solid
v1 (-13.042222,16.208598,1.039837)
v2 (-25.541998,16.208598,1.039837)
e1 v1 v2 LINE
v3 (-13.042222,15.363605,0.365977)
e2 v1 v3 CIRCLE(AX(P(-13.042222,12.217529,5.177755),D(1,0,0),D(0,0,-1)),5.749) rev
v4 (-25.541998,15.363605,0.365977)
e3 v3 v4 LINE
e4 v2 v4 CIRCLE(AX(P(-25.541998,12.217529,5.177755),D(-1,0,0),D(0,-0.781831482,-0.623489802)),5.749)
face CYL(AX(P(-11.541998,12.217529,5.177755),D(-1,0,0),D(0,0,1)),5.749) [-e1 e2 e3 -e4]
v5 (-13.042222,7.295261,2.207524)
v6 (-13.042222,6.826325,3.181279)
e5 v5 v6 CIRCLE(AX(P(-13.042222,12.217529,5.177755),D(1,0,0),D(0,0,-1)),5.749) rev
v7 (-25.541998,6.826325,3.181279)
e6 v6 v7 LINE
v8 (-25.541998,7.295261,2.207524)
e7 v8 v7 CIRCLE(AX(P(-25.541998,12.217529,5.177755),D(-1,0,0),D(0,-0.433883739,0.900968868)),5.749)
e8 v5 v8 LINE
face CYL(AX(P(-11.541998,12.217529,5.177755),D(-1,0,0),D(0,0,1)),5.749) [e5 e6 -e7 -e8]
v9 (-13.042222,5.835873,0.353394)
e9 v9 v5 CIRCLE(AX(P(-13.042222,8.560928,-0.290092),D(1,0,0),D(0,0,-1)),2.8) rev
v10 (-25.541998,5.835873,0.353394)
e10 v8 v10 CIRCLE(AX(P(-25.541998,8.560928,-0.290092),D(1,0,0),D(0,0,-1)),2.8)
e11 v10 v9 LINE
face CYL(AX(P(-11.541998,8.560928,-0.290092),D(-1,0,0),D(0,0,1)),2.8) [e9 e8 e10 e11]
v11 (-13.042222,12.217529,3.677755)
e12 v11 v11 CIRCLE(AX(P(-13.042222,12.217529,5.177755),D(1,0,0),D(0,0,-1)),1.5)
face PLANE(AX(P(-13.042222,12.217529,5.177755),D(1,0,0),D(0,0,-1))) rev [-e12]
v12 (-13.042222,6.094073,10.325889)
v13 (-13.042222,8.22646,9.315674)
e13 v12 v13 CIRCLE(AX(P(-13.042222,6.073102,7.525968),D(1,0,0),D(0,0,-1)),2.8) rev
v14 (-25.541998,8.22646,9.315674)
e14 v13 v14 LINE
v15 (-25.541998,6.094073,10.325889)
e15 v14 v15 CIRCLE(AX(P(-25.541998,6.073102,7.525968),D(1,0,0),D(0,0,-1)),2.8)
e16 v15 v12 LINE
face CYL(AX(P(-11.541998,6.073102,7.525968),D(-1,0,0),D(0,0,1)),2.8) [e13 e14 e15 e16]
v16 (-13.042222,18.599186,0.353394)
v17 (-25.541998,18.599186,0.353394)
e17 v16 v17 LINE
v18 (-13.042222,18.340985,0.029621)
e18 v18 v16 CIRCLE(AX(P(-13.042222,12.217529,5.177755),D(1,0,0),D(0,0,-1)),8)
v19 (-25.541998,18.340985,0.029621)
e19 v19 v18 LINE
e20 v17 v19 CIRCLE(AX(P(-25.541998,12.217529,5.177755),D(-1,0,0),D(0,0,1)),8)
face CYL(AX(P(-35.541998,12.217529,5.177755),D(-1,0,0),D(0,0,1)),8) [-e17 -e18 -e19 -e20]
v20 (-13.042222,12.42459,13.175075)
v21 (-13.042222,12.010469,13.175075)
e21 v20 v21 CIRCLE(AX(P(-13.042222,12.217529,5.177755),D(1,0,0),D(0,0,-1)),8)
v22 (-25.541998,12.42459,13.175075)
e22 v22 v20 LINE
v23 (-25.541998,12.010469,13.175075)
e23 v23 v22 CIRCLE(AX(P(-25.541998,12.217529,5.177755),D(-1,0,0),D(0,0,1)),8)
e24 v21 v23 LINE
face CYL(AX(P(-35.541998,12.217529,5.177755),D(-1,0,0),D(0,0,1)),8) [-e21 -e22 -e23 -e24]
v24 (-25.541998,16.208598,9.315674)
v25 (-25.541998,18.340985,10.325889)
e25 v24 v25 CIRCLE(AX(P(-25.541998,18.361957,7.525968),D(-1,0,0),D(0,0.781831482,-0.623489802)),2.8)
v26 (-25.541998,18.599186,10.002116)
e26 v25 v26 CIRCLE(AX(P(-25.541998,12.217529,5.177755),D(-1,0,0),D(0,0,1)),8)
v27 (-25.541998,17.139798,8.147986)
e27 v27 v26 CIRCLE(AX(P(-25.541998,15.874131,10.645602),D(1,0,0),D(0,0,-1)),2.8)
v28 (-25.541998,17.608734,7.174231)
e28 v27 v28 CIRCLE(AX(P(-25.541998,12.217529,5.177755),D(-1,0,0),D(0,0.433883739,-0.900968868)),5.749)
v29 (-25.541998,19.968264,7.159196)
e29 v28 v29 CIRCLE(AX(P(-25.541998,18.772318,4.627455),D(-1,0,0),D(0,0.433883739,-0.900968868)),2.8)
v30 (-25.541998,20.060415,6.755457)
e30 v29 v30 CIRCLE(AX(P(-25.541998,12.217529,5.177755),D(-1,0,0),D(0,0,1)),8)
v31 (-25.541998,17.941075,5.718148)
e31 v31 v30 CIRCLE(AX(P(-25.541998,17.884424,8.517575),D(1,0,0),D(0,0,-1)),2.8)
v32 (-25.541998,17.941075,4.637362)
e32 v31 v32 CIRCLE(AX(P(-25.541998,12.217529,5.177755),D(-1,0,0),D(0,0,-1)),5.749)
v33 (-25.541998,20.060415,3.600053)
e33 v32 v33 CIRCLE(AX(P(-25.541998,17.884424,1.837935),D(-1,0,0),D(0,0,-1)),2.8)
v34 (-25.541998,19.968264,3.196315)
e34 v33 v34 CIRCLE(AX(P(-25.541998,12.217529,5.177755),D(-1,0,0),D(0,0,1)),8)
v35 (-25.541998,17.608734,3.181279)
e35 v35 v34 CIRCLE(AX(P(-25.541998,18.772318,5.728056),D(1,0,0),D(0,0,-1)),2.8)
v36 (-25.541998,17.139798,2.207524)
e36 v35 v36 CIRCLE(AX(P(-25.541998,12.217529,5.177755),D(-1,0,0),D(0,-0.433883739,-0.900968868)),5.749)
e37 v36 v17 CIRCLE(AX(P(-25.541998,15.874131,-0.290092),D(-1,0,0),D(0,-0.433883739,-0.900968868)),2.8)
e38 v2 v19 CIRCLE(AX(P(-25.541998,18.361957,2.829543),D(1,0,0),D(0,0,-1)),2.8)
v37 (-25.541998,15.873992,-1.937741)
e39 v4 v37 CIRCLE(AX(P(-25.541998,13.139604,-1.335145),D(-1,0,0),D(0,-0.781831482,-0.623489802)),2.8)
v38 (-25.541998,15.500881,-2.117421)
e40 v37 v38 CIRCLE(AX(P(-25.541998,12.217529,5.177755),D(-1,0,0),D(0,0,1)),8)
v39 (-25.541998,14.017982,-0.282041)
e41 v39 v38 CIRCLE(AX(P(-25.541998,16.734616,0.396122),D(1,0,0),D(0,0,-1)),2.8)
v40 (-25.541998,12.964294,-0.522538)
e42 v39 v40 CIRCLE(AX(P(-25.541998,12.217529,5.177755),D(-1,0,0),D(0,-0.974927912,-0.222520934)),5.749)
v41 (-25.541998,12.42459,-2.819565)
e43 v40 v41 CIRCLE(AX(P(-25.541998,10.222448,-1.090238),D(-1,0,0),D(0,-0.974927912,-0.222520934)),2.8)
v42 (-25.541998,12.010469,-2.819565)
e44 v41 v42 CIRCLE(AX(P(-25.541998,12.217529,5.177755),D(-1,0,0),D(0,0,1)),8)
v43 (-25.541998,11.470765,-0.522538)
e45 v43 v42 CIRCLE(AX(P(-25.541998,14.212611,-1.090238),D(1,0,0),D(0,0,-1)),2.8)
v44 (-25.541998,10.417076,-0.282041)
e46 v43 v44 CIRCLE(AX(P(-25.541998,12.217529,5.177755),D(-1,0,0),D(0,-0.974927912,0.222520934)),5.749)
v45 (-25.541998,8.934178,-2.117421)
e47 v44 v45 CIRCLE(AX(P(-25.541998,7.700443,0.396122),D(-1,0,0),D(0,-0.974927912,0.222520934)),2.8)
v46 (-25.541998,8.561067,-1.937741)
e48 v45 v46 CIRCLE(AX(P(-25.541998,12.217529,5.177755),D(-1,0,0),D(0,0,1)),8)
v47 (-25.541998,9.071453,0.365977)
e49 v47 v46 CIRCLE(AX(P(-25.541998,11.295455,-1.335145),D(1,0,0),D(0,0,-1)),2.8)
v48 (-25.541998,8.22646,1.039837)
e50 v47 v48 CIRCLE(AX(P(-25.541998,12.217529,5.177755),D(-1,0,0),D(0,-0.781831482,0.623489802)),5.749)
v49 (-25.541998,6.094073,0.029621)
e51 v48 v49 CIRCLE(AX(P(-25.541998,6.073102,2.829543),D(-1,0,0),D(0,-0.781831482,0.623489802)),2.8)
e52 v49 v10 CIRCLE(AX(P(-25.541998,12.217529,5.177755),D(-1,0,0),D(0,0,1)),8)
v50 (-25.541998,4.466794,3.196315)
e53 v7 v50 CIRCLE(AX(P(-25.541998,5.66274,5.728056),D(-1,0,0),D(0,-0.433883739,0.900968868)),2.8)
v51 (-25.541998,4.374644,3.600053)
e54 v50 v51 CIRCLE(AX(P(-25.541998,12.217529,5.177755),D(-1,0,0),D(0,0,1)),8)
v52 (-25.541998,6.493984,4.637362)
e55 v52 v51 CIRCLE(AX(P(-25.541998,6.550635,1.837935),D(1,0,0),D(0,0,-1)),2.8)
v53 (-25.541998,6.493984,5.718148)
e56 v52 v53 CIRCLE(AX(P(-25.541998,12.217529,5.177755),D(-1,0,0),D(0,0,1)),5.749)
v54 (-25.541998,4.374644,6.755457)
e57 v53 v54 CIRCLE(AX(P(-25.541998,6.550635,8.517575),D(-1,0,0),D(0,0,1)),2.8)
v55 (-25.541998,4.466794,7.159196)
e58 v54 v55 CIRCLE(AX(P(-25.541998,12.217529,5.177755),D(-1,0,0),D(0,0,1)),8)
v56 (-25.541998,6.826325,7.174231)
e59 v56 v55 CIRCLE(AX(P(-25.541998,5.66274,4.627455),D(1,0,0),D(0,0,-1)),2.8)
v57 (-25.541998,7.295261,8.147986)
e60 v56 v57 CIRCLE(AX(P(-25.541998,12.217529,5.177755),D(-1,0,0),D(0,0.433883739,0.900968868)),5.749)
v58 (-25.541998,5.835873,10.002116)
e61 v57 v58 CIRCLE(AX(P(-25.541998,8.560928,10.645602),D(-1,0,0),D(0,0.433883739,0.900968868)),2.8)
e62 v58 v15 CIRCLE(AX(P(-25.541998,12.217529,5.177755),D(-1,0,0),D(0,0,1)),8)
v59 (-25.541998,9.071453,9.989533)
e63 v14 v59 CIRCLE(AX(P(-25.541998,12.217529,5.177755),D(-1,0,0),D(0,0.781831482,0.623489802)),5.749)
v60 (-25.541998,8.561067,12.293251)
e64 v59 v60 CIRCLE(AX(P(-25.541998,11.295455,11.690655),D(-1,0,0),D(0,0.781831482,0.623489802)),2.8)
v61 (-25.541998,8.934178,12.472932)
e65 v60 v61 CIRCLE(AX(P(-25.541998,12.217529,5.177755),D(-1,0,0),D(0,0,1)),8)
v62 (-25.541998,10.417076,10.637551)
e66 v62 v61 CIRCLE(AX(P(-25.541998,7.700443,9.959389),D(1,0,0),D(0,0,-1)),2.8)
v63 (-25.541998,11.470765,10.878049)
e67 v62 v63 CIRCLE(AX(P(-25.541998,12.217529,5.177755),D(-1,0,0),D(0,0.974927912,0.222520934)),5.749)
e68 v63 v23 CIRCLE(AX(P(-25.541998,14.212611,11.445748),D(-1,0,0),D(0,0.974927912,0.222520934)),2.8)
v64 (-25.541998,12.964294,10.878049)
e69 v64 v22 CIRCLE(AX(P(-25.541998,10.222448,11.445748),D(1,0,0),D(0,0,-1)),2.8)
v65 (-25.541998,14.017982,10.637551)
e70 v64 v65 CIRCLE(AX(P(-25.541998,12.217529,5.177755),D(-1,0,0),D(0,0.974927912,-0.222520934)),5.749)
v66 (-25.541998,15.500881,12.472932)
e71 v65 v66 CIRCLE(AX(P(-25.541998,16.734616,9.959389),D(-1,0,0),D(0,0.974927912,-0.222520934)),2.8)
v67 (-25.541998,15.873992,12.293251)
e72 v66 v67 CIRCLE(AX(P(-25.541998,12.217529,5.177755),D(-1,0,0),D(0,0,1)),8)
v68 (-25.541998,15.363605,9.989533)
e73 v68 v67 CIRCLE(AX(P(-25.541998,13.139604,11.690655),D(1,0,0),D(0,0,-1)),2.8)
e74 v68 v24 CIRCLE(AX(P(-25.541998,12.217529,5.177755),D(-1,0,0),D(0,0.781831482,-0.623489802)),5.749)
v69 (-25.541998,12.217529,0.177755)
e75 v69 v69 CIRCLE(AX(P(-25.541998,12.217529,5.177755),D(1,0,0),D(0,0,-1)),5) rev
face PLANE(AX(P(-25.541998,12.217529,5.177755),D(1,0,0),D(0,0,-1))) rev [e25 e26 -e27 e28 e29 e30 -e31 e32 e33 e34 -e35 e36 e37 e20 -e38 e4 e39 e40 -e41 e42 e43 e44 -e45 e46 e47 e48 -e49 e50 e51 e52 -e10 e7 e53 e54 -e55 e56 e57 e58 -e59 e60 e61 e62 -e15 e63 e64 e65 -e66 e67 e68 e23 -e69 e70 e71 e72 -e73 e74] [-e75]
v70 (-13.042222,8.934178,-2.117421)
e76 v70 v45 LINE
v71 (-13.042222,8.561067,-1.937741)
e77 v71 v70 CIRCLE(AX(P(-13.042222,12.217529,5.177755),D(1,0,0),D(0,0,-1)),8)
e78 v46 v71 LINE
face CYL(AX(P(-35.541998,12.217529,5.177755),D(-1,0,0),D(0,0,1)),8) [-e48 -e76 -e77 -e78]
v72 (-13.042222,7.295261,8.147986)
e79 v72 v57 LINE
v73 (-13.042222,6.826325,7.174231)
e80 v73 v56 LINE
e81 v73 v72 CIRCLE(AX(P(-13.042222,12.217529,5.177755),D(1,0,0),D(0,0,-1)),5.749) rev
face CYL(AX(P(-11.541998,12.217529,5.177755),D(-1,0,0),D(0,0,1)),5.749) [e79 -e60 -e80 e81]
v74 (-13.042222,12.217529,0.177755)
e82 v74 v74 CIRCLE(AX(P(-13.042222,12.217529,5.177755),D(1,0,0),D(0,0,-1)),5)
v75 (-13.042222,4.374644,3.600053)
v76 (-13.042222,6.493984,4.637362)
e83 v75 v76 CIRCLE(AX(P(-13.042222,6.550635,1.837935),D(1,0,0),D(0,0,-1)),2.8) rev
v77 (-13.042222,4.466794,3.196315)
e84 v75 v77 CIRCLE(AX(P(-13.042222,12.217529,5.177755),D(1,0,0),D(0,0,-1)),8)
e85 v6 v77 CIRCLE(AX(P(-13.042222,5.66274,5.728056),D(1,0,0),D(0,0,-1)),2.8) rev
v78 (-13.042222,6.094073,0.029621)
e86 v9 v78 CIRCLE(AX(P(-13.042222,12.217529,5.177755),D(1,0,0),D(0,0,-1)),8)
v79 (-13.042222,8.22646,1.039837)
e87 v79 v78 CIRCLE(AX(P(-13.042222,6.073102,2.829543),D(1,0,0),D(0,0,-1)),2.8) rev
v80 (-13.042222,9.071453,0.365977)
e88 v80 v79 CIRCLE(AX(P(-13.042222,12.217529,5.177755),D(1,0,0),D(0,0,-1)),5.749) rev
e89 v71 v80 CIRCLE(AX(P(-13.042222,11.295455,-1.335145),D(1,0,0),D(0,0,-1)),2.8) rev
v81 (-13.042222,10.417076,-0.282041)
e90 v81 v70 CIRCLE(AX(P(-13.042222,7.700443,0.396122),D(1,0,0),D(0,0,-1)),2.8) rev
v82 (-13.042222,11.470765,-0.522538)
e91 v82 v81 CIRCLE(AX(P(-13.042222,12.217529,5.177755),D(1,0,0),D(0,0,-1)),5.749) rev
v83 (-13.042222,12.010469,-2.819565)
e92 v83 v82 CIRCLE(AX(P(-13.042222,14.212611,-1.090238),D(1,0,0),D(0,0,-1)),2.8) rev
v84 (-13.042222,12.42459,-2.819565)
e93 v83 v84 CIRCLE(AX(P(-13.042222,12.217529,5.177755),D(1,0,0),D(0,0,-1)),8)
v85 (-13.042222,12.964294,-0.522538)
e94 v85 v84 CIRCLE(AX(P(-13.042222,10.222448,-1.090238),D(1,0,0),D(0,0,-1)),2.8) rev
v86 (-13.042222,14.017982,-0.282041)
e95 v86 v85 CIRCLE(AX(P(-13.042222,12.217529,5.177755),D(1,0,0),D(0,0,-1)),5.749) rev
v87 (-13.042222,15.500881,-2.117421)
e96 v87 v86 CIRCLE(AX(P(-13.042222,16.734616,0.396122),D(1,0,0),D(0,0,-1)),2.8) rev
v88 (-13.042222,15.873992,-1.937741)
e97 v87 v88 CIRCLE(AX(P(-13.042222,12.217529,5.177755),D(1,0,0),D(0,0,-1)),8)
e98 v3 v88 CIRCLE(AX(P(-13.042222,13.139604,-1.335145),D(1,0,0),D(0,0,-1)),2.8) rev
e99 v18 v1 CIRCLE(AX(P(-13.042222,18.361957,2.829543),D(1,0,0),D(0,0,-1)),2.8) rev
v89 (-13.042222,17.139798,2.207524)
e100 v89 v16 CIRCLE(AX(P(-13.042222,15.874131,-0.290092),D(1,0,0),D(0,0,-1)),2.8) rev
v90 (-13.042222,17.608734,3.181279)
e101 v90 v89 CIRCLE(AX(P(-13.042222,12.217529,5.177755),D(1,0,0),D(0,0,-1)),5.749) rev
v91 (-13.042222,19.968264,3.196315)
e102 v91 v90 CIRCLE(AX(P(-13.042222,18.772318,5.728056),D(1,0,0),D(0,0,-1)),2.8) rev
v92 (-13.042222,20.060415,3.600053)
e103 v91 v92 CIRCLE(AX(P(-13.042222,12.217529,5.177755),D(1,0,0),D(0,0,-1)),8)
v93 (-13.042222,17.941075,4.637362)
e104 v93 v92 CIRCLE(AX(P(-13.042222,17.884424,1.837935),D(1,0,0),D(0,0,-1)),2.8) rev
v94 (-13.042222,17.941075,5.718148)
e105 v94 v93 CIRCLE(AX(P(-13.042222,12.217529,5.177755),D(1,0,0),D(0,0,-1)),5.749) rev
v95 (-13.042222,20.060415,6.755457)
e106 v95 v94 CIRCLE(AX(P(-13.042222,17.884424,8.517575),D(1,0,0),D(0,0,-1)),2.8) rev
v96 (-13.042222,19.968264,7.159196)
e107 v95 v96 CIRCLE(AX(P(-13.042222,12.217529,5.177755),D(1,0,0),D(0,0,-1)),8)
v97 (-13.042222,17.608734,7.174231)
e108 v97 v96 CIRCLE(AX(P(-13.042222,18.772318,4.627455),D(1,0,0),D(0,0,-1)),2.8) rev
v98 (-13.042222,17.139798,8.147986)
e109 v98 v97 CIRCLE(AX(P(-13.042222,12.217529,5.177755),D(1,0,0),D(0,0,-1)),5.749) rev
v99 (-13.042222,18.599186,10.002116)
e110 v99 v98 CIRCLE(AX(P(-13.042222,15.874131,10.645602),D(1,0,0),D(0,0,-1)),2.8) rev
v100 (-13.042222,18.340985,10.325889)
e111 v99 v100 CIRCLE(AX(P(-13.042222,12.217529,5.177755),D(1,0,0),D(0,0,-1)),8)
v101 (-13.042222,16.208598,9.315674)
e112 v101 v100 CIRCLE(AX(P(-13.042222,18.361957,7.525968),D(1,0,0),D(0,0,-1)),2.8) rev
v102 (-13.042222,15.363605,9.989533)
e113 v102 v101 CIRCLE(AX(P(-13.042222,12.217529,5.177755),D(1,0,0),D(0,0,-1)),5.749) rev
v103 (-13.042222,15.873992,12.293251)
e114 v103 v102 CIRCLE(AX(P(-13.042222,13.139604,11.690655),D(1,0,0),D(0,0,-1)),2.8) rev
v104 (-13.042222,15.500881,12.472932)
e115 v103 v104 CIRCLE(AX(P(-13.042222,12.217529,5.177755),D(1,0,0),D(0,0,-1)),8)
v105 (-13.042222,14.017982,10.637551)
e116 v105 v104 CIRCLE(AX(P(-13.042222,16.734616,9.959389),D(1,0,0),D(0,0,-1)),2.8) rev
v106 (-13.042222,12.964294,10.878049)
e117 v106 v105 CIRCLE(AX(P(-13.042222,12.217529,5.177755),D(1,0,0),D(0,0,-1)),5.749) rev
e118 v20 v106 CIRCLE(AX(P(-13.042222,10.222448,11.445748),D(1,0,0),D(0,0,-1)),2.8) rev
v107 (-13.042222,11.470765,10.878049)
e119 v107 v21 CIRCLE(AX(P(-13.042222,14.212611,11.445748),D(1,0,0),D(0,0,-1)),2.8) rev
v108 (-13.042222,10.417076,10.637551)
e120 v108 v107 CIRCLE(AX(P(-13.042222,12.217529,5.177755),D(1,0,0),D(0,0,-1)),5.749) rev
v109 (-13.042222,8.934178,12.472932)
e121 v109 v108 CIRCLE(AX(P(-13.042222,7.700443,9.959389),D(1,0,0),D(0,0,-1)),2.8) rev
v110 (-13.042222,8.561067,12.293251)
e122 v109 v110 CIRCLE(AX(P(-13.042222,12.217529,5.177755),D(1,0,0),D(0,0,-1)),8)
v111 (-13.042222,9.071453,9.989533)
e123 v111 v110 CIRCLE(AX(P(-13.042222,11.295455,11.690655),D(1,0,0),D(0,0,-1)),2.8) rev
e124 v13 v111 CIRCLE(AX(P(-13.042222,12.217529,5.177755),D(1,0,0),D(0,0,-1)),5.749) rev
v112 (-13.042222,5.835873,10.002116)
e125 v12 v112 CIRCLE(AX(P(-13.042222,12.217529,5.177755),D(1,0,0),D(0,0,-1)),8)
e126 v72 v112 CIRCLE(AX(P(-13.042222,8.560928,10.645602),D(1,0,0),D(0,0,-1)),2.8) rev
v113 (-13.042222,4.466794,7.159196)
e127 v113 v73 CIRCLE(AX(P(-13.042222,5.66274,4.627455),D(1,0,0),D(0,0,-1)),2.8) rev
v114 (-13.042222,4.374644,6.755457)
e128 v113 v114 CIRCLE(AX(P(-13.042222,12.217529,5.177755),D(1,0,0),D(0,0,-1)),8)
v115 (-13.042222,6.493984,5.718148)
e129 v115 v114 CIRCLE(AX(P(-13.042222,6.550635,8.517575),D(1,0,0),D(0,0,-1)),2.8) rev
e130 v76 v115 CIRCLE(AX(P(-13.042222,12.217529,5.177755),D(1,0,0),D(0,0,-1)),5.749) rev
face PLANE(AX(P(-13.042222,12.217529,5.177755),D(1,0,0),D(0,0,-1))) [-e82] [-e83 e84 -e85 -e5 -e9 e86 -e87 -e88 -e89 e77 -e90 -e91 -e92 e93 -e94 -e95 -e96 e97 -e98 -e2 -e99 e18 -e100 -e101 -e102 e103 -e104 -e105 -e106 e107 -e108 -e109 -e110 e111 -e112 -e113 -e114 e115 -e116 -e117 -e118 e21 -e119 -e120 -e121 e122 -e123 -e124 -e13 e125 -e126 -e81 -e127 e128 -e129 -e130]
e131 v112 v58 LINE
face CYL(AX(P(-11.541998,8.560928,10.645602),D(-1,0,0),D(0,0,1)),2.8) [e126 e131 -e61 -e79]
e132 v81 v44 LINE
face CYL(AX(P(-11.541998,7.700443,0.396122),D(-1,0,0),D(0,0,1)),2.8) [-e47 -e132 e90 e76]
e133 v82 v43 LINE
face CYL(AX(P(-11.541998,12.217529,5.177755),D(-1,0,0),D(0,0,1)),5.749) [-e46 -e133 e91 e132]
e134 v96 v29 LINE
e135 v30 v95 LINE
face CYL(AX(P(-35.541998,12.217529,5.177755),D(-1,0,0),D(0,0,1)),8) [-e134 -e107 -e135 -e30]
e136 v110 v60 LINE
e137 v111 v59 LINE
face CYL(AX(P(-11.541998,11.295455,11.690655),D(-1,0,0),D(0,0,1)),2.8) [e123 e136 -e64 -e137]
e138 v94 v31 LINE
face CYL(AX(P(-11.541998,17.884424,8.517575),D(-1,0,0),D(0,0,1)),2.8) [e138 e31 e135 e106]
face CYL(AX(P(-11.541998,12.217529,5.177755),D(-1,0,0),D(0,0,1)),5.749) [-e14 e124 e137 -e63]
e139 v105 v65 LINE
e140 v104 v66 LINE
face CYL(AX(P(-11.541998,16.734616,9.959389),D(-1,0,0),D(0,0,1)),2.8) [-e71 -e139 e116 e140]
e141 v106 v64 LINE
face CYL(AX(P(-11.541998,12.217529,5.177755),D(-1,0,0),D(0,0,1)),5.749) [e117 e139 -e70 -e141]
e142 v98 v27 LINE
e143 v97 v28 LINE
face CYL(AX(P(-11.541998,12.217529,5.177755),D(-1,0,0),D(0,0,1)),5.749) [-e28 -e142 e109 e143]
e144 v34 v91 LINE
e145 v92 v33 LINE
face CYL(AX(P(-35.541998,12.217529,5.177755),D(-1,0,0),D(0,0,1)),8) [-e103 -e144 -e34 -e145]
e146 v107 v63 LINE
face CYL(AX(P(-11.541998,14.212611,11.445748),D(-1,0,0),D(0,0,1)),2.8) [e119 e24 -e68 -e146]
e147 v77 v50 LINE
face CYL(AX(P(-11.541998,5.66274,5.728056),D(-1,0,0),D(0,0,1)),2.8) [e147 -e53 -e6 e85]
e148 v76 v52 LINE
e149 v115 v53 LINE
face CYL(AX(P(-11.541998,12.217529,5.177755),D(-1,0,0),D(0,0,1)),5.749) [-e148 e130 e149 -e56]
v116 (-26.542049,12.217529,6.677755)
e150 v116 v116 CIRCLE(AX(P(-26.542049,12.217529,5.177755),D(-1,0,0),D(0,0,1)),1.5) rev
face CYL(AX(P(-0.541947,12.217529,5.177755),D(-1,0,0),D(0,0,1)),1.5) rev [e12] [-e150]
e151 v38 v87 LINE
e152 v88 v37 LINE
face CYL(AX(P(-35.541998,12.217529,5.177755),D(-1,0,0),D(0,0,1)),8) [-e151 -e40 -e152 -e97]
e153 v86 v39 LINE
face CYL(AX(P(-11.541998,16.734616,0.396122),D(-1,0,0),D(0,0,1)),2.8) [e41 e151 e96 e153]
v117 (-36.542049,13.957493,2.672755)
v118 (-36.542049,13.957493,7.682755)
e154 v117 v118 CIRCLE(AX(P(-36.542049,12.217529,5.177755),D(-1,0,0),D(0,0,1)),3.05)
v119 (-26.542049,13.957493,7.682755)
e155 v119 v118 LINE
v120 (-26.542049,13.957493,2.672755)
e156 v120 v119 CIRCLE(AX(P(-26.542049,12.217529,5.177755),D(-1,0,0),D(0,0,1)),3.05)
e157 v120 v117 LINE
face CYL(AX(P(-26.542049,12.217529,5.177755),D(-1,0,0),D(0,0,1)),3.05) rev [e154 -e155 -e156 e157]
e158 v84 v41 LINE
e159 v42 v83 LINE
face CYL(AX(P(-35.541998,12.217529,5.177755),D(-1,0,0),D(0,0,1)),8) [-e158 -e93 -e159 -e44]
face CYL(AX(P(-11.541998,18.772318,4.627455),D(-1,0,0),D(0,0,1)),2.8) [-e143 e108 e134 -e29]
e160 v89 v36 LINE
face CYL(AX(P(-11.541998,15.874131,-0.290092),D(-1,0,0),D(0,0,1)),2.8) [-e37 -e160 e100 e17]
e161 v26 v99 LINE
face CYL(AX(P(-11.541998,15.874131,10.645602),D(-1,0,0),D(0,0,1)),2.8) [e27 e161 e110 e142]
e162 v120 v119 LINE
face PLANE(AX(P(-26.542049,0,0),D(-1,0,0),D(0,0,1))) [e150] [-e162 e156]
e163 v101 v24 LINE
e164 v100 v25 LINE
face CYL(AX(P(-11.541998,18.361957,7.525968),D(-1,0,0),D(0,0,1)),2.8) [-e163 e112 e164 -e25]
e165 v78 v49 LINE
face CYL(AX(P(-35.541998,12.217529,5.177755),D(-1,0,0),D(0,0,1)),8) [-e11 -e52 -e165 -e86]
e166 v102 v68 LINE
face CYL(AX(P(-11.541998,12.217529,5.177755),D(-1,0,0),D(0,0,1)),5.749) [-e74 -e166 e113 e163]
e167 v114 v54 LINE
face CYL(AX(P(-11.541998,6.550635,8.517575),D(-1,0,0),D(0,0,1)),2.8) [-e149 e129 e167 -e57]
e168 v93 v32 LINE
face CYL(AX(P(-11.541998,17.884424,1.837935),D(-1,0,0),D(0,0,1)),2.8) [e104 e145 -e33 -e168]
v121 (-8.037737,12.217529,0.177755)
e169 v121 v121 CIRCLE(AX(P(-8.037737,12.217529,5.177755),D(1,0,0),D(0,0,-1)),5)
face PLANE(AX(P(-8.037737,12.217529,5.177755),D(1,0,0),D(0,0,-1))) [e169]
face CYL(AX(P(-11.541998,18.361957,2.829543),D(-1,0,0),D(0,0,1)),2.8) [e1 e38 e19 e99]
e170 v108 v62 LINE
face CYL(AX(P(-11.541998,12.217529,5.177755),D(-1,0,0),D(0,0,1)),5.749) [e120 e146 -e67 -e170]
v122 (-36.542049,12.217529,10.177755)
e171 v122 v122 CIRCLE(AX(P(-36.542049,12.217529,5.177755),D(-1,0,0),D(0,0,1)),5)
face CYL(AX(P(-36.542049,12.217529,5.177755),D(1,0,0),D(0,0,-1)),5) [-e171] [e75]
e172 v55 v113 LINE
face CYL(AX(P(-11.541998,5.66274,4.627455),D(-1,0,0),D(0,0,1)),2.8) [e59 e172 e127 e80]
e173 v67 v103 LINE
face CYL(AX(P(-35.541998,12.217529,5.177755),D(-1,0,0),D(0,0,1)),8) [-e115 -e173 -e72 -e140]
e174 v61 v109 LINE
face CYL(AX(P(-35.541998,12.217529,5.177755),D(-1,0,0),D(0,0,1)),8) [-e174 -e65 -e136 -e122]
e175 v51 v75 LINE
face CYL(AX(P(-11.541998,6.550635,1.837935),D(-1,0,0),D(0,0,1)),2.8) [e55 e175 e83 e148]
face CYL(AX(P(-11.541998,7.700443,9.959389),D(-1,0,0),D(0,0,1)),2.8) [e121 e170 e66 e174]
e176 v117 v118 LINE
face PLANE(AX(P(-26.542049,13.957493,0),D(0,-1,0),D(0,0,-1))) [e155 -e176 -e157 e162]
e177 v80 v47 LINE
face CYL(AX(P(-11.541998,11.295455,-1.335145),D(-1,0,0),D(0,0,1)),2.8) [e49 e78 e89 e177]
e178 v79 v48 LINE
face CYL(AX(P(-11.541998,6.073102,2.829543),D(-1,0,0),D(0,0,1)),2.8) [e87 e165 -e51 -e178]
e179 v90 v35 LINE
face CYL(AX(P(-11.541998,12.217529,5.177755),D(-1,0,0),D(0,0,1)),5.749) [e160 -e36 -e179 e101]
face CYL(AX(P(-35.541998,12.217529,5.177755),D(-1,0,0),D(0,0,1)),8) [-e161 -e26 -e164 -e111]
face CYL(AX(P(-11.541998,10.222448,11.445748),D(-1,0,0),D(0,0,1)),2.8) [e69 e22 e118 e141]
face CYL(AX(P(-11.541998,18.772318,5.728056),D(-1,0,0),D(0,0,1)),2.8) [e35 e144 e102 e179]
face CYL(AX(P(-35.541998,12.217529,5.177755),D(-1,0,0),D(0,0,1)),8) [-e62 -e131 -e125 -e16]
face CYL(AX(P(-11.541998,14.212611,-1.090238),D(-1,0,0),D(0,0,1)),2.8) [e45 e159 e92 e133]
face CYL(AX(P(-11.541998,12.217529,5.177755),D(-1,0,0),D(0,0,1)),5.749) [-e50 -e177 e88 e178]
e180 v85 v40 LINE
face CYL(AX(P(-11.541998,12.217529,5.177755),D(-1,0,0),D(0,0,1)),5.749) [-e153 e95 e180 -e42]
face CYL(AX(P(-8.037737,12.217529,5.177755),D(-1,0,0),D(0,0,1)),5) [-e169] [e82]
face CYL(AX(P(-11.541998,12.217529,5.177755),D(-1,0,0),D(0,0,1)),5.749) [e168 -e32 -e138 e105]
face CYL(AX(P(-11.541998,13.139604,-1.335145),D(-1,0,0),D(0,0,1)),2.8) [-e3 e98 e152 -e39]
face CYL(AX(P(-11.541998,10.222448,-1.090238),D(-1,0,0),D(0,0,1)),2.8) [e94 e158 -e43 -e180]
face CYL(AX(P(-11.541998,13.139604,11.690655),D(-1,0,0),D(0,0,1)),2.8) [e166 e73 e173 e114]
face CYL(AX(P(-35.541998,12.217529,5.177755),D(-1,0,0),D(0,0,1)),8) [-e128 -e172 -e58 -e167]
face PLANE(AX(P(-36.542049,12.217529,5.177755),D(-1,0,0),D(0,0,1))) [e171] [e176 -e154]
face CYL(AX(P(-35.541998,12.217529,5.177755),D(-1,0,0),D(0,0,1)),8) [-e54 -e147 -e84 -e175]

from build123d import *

# Parameters (mm, degrees)
SPUR_START                 = -25.541998066
SPUR_GEAR_AM_OUTLINE_R     = 1.5
SPUR_GEAR_AM_DEPTH         = 14
SPUR_START_2               = -36.542048866
SPUR_GEAR_AM_2_OUTLINE_R   = 5
SPUR_GEAR_AM_2_OUTLINE_R_2 = 1.5
SPUR_GEAR_AM_2_DEPTH       = 11.0000508
SKETCH1_R                  = 10.392655515
CUT_EXTRUDE1_DEPTH         = 1.500223942
SKETCH2_R                  = 5
BOSS_EXTRUDE1_DEPTH        = 5.004484533
SKETCH3_R                  = 1.5
CUT_EXTRUDE2_DEPTH         = 10


# Read off the part's stored shape, not the designer's step: spur gear_am
with BuildPart() as part:
    # spur gear_am outline → spur gear_am (new body)
    with BuildSketch(Plane.YZ.offset(SPUR_START)):
        with BuildLine():
            ThreePointArc((8.934177524, 12.472931761), (8.746459365, 12.38550613), (8.561066896, 12.293251153))
            ThreePointArc((8.561066896, 12.293251153), (8.561742052, 11.085003925), (9.071453323, 9.989533141))
            ThreePointArc((9.071453323, 9.989533141), (8.633086407, 9.672504379), (8.226460402, 9.315673773))
            ThreePointArc((8.226460402, 9.315673773), (7.271876786, 10.0563707), (6.094073075, 10.325889231))
            ThreePointArc((6.094073075, 10.325889231), (5.962877418, 10.165673601), (5.835872509, 10.002115962))
            ThreePointArc((5.835872509, 10.002115962), (6.360719629, 8.913815765), (7.295260575, 8.147986124))
            ThreePointArc((7.295260575, 8.147986124), (7.037859256, 7.672152803), (6.826324883, 7.174231124))
            ThreePointArc((6.826324883, 7.174231124), (5.64489841, 7.427397687), (4.466794227, 7.159195615))
            ThreePointArc((4.466794227, 7.159195615), (4.41810598, 6.957922658), (4.374643512, 6.755456952))
            ThreePointArc((4.374643512, 6.755456952), (5.319710186, 6.002654986), (6.493983512, 5.718148442))
            ThreePointArc((6.493983512, 5.718148442), (6.468529278, 5.177755187), (6.493983512, 4.637361931))
            ThreePointArc((6.493983512, 4.637361931), (5.319710186, 4.352855387), (4.374643512, 3.600053421))
            ThreePointArc((4.374643512, 3.600053421), (4.41810598, 3.397587715), (4.466794227, 3.196314758))
            ThreePointArc((4.466794227, 3.196314758), (5.64489841, 2.928112685), (6.826324883, 3.181279248))
            ThreePointArc((6.826324883, 3.181279248), (7.037859256, 2.68335757), (7.295260575, 2.207524249))
            ThreePointArc((7.295260575, 2.207524249), (6.360719629, 1.441694608), (5.835872509, 0.353394411))
            ThreePointArc((5.835872509, 0.353394411), (5.962877418, 0.189836772), (6.094073075, 0.029621142))
            ThreePointArc((6.094073075, 0.029621142), (7.271876786, 0.299139672), (8.226460402, 1.039836599))
            ThreePointArc((8.226460402, 1.039836599), (8.633086407, 0.683005994), (9.071453323, 0.365977232))
            ThreePointArc((9.071453323, 0.365977232), (8.561742052, -0.729493552), (8.561066896, -1.93774078))
            ThreePointArc((8.561066896, -1.93774078), (8.746459365, -2.029995757), (8.934177524, -2.117421389))
            ThreePointArc((8.934177524, -2.117421389), (9.878402292, -1.363563706), (10.41707606, -0.282040525))
            ThreePointArc((10.41707606, -0.282040525), (10.938256428, -0.427105381), (11.470764997, -0.522538149))
            ThreePointArc((11.470764997, -0.522538149), (11.48683797, -1.730678653), (12.0104685, -2.819564729))
            ThreePointArc((12.0104685, -2.819564729), (12.217529278, -2.822244814), (12.424590055, -2.819564729))
            ThreePointArc((12.424590055, -2.819564729), (12.948220585, -1.730678653), (12.964293559, -0.522538149))
            ThreePointArc((12.964293559, -0.522538149), (13.496802127, -0.427105381), (14.017982495, -0.282040525))
            ThreePointArc((14.017982495, -0.282040525), (14.556656263, -1.363563706), (15.500881031, -2.117421389))
            ThreePointArc((15.500881031, -2.117421389), (15.688599191, -2.029995757), (15.87399166, -1.93774078))
            ThreePointArc((15.87399166, -1.93774078), (15.873316504, -0.729493552), (15.363605233, 0.365977232))
            ThreePointArc((15.363605233, 0.365977232), (15.801972149, 0.683005994), (16.208598153, 1.039836599))
            ThreePointArc((16.208598153, 1.039836599), (17.16318177, 0.299139672), (18.34098548, 0.029621142))
            ThreePointArc((18.34098548, 0.029621142), (18.472181137, 0.189836772), (18.599186046, 0.353394411))
            ThreePointArc((18.599186046, 0.353394411), (18.074338927, 1.441694609), (17.13979798, 2.207524249))
            ThreePointArc((17.13979798, 2.207524249), (17.397199299, 2.68335757), (17.608733673, 3.181279248))
            ThreePointArc((17.608733673, 3.181279248), (18.790160146, 2.928112685), (19.968264329, 3.196314758))
            ThreePointArc((19.968264329, 3.196314758), (20.016952575, 3.397587715), (20.060415044, 3.600053421))
            ThreePointArc((20.060415044, 3.600053421), (19.11534837, 4.352855387), (17.941075043, 4.637361931))
            ThreePointArc((17.941075043, 4.637361931), (17.966529278, 5.177755187), (17.941075043, 5.718148442))
            ThreePointArc((17.941075043, 5.718148442), (19.11534837, 6.002654986), (20.060415044, 6.755456952))
            ThreePointArc((20.060415044, 6.755456952), (20.016952575, 6.957922658), (19.968264329, 7.159195615))
            ThreePointArc((19.968264329, 7.159195615), (18.790160146, 7.427397687), (17.608733673, 7.174231124))
            ThreePointArc((17.608733673, 7.174231124), (17.397199299, 7.672152802), (17.13979798, 8.147986124))
            ThreePointArc((17.13979798, 8.147986124), (18.074338927, 8.913815764), (18.599186046, 10.002115962))
            ThreePointArc((18.599186046, 10.002115962), (18.472181137, 10.165673601), (18.34098548, 10.325889231))
            ThreePointArc((18.34098548, 10.325889231), (17.16318177, 10.0563707), (16.208598153, 9.315673773))
            ThreePointArc((16.208598153, 9.315673773), (15.801972149, 9.672504379), (15.363605233, 9.989533141))
            ThreePointArc((15.363605233, 9.989533141), (15.873316504, 11.085003925), (15.87399166, 12.293251153))
            ThreePointArc((15.87399166, 12.293251153), (15.688599191, 12.38550613), (15.500881031, 12.472931761))
            ThreePointArc((15.500881031, 12.472931761), (14.556656263, 11.719074079), (14.017982495, 10.637550898))
            ThreePointArc((14.017982495, 10.637550898), (13.496802127, 10.782615754), (12.964293559, 10.878048522))
            ThreePointArc((12.964293559, 10.878048522), (12.948220585, 12.086189026), (12.424590055, 13.175075102))
            ThreePointArc((12.424590055, 13.175075102), (12.217529278, 13.177755186), (12.0104685, 13.175075102))
            ThreePointArc((12.0104685, 13.175075102), (11.48683797, 12.086189026), (11.470764997, 10.878048522))
            ThreePointArc((11.470764997, 10.878048522), (10.938256428, 10.782615754), (10.41707606, 10.637550898))
            ThreePointArc((10.41707606, 10.637550898), (9.878402292, 11.719074079), (8.934177524, 12.472931761))
        make_face()
        with Locations((12.217529278, 5.177755186)):
            Circle(SPUR_GEAR_AM_OUTLINE_R, mode=Mode.SUBTRACT)
    extrude(amount=SPUR_GEAR_AM_DEPTH)

    # spur gear_am 2 outline → spur gear_am 2 (add)
    with BuildSketch(Plane.YZ.offset(SPUR_START_2)):
        with Locations((12.217529278, 5.177755186)):
            Circle(SPUR_GEAR_AM_2_OUTLINE_R)
        with Locations((12.217529278, 5.177755186)):
            Circle(SPUR_GEAR_AM_2_OUTLINE_R_2, mode=Mode.SUBTRACT)
    extrude(amount=SPUR_GEAR_AM_2_DEPTH)

    # Sketch1 → Cut-Extrude1 (cut)
    with BuildSketch(Plane(origin=(-11.541998066, 0, 0), x_dir=(0, 0, -1), z_dir=(1, 0, 0))):
        with Locations((-5.177755186, 12.217529278)):
            Circle(SKETCH1_R)
    extrude(amount=-CUT_EXTRUDE1_DEPTH, mode=Mode.SUBTRACT)

    # Sketch2 → Boss-Extrude1 (add)
    with BuildSketch(Plane(origin=(-13.042222007, 0, 0), x_dir=(0, 0, -1), z_dir=(1, 0, 0))):
        with Locations((-5.177755186, 12.217529278)):
            Circle(SKETCH2_R)
    extrude(amount=BOSS_EXTRUDE1_DEPTH)

    # Sketch3 → Cut-Extrude2 (cut)
    with BuildSketch(Plane.ZY.offset(36.542048866)):
        with BuildLine():
            Line((7.682755186, 13.957493358), (2.672755186, 13.957493358))
            ThreePointArc((2.672755186, 13.957493358), (4.266094614, 9.306966617), (8.227755186, 12.217529278))
            ThreePointArc((8.227755186, 12.217529278), (8.088317847, 13.12918985), (7.682755186, 13.957493358))
        make_face()
        with Locations((5.177755186, 12.217529278)):
            Circle(SKETCH3_R, mode=Mode.SUBTRACT)
    extrude(amount=-CUT_EXTRUDE2_DEPTH, mode=Mode.SUBTRACT)


solid = part.part
